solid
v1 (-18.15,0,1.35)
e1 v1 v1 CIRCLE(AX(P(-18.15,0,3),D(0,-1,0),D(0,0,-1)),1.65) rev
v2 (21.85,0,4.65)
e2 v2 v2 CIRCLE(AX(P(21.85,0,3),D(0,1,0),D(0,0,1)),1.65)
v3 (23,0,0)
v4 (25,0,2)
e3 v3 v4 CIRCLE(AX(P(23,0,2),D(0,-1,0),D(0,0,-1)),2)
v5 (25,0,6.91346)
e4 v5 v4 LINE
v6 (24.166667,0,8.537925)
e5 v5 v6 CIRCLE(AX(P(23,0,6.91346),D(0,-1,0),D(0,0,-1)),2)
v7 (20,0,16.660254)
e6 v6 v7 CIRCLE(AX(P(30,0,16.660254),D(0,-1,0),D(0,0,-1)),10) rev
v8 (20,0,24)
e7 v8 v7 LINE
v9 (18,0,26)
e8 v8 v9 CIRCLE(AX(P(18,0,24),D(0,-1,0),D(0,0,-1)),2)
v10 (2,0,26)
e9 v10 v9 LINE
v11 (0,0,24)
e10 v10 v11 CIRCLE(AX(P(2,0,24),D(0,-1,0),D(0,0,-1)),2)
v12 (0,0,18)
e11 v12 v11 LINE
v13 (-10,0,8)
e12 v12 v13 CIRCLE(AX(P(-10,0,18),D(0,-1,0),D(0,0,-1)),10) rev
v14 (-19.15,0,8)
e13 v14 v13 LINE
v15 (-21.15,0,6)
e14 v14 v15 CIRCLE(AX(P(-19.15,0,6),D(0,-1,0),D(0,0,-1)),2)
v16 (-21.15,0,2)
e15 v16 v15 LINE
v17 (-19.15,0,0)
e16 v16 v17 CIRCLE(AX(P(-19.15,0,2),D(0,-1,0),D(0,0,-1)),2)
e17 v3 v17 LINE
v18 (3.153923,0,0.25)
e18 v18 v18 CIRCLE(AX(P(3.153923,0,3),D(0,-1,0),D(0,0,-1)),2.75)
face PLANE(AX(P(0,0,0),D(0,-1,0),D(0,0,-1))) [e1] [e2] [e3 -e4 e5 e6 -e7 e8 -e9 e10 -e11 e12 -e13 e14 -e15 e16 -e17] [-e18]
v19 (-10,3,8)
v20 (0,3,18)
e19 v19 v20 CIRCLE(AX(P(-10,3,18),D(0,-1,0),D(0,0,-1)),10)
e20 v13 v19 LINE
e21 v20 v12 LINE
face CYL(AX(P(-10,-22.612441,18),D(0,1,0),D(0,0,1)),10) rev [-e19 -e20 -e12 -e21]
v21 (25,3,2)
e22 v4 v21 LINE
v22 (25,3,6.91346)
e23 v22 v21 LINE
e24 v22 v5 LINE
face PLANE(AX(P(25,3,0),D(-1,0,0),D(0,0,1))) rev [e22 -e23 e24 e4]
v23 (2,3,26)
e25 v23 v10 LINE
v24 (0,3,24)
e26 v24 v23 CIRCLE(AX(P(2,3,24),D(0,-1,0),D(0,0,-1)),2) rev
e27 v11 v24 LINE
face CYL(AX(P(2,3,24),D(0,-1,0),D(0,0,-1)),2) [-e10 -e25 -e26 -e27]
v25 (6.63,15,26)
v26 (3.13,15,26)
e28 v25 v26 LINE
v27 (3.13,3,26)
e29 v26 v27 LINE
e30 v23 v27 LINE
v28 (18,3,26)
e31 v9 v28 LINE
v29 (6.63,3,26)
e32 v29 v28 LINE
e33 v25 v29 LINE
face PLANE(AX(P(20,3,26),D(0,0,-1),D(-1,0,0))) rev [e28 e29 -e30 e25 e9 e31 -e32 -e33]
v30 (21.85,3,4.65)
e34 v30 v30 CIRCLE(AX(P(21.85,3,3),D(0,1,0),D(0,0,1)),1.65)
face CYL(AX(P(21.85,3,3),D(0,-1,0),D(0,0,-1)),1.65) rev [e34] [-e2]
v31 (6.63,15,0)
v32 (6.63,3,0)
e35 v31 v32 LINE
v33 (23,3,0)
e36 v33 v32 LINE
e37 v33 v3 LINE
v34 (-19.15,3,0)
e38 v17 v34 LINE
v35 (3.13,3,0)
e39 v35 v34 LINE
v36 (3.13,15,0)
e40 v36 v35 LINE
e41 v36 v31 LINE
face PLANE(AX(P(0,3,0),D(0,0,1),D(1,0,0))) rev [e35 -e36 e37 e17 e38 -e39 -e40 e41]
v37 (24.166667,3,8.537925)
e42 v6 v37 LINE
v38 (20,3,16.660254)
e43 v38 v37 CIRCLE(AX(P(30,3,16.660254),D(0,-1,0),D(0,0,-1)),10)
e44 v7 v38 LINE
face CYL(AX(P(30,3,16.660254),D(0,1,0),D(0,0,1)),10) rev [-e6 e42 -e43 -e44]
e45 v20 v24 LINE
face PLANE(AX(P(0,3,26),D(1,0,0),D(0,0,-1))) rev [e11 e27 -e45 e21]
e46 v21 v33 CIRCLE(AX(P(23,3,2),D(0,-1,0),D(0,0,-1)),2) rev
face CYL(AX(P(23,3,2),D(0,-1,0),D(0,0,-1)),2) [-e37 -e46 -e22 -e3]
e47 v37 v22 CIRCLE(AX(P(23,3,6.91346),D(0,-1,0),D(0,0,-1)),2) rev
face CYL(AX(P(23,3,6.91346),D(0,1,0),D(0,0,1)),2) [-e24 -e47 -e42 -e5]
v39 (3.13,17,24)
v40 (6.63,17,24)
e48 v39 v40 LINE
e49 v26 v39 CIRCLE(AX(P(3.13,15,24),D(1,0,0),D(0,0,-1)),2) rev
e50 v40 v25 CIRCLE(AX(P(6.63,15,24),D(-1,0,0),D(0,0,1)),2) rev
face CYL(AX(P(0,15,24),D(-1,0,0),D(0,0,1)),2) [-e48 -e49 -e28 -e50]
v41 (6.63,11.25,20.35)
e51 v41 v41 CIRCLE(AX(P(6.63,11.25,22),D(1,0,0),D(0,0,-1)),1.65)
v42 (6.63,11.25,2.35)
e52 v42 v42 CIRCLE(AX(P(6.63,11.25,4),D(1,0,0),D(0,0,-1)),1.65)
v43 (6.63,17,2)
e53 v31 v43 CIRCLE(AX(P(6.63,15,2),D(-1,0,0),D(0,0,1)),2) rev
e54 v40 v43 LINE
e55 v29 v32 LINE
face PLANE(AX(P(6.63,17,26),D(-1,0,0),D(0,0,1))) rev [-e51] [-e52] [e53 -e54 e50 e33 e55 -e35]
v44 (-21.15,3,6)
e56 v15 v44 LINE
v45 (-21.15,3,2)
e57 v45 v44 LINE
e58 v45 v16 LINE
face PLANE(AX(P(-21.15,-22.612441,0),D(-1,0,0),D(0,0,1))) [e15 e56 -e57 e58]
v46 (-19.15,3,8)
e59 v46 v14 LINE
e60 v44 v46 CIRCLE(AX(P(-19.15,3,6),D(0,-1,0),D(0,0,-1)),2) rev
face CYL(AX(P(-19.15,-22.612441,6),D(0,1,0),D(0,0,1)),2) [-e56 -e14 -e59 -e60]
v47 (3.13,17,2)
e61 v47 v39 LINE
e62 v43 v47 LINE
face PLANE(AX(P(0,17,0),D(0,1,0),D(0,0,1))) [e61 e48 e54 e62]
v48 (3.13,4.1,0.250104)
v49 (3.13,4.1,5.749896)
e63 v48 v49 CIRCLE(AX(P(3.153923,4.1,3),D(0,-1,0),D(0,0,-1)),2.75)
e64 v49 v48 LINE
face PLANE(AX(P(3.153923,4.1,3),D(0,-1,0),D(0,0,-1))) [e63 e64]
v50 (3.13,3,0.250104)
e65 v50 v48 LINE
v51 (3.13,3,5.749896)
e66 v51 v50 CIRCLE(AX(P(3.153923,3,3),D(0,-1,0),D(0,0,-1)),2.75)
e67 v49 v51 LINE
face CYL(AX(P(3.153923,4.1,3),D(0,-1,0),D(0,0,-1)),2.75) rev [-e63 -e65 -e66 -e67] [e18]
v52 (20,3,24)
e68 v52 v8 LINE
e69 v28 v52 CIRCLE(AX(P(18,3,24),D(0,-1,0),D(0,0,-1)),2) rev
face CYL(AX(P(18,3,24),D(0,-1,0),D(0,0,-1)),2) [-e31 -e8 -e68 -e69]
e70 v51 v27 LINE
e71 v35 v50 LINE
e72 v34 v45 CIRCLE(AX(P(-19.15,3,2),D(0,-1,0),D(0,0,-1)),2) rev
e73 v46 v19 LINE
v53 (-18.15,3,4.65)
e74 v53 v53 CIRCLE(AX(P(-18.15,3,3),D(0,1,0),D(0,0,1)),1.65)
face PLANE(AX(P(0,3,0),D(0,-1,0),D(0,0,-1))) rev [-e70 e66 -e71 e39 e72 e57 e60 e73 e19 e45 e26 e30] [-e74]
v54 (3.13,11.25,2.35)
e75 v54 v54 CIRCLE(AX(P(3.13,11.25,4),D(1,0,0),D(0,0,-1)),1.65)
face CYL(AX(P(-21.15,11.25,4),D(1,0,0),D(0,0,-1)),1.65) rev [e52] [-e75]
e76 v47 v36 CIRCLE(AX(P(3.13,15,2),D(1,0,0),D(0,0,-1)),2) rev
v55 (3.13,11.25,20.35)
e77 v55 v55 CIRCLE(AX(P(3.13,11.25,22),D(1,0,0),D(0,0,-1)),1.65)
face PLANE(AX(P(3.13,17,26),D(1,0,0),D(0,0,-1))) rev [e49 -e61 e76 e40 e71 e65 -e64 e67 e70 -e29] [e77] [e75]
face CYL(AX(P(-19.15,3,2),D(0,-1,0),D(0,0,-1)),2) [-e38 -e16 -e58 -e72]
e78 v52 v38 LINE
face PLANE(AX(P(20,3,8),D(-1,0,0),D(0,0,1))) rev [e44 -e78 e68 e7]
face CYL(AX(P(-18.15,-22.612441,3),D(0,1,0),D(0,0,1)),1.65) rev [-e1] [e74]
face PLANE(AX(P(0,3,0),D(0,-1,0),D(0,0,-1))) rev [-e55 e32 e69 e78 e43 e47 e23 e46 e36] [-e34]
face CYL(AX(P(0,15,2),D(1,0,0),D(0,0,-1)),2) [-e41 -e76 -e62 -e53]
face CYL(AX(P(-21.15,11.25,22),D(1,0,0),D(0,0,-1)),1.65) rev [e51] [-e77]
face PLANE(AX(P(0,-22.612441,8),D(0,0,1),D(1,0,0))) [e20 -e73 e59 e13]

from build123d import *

# Parameters (mm, degrees)
SKETCH1_R           = 1.65
BOSS_EXTRUDE1_DEPTH = 3
SKETCH3_W           = 3.5
SKETCH3_H           = 26
BOSS_EXTRUDE2_DEPTH = 14
SKETCH5_W           = 21.15
SKETCH5_H           = 8
SKETCH5_R           = 1.65
BOSS_EXTRUDE4_DEPTH = 3
SKETCH6_R           = 1.65
CUT_EXTRUDE1_DEPTH  = 42.674073475
FILLET1_R           = 10
FILLET2_R           = 2
SKETCH7_R           = 2.75
CUT_EXTRUDE2_DEPTH  = 4.1


with BuildPart() as part:
    # Sketch1 → Boss-Extrude1 (new body)
    with BuildSketch(Plane(origin=(0, 0, 0), x_dir=(1, 0, 0), z_dir=(0, 1, 0))):
        Polygon((0, 0), (25, 0), (25, -8), (20, -8), (20, -26), (0, -26), align=None)
        with Locations(Location((21.85, -3, 0), (0, 0, 270))):
            Circle(SKETCH1_R, mode=Mode.SUBTRACT)
    extrude(amount=BOSS_EXTRUDE1_DEPTH)

    # Sketch3 → Boss-Extrude2 (add)
    with BuildSketch(Plane(origin=(0, 3, 0), x_dir=(1, 0, 0), z_dir=(0, 1, 0))):
        with Locations((4.88, -13)):
            Rectangle(SKETCH3_W, SKETCH3_H)
    extrude(amount=BOSS_EXTRUDE2_DEPTH)

    # Sketch5 → Boss-Extrude4 (add)
    with BuildSketch(Plane(origin=(0, 3, 0), x_dir=(1, 0, 0), z_dir=(0, 1, 0))):
        with Locations((-10.575, -4)):
            Rectangle(SKETCH5_W, SKETCH5_H)
        with Locations(Location((-18.15, -3, 0), (0, 0, 270))):
            Circle(SKETCH5_R, mode=Mode.SUBTRACT)
    extrude(amount=-BOSS_EXTRUDE4_DEPTH)

    # Sketch6 → Cut-Extrude1 (cut, through all)
    with BuildSketch(Plane(origin=(6.63, 0, 0), x_dir=(0, 0, -1), z_dir=(1, 0, 0))):
        with Locations((-4, 11.25)):
            Circle(SKETCH6_R)
        with Locations((-22, 11.25)):
            Circle(SKETCH6_R)
    extrude(amount=-CUT_EXTRUDE1_DEPTH, mode=Mode.SUBTRACT)

    # Fillet1
    # the kernel refuses this fillet: 10 mm, written as the material it adds along each edge
    with BuildSketch(Plane(origin=(20, 0, 8), x_dir=(0, 0, 1), z_dir=(0, 1, 0))) as fillet1_piece_1:
        with BuildLine():
            CenterArc((8.660254038, 10), FILLET1_R, 210, 60)
            Line((0, 5), (-0.173205081, 4.9))
            ThreePointArc((-0.173205081, 4.9), (-0.2, 2.5), (-0.2, 0))
            Line((-0.2, 0), (0, -0.2))
            Line((0, -0.2), (8.660254038, -0.2))
            Line((8.660254038, -0.2), (8.660254038, 0))
        make_face()
    extrude(amount=3)
    with BuildSketch(Plane(origin=(0, 3, 8), x_dir=(0, 0, 1), z_dir=(0, -1, 0))) as fillet1_piece_2:
        with BuildLine():
            CenterArc((FILLET1_R, FILLET1_R), FILLET1_R, 180, 90)
            Line((0, FILLET1_R), (-FILLET1_R * 0.02, FILLET1_R))
            Line((-FILLET1_R * 0.02, FILLET1_R), (-FILLET1_R * 0.02, -FILLET1_R * 0.02))
            Line((-FILLET1_R * 0.02, -FILLET1_R * 0.02), (FILLET1_R, -FILLET1_R * 0.02))
            Line((FILLET1_R, -FILLET1_R * 0.02), (FILLET1_R, 0))
        make_face()
    extrude(amount=3)

    # Fillet2
    fillet2_edges = [part.edges().sort_by_distance(p)[0] for p in [
        (25, 1.5, 0),
        (25, 1.5, 8),
        (20, 1.5, 26),
        (0, 1.5, 26),
        (4.88, 17, 26),
        (4.88, 17, 0),
        (-21.15, 1.5, 8),
        (-21.15, 1.5, 0),
    ]]
    fillet(fillet2_edges, radius=FILLET2_R)

    # Sketch7 → Cut-Extrude2 (cut)
    with BuildSketch(Plane.XZ):
        with Locations(Location((3.153923281, 3, 0), (0, 0, 270))):
            Circle(SKETCH7_R)
    extrude(amount=-CUT_EXTRUDE2_DEPTH, mode=Mode.SUBTRACT)


solid = part.part
